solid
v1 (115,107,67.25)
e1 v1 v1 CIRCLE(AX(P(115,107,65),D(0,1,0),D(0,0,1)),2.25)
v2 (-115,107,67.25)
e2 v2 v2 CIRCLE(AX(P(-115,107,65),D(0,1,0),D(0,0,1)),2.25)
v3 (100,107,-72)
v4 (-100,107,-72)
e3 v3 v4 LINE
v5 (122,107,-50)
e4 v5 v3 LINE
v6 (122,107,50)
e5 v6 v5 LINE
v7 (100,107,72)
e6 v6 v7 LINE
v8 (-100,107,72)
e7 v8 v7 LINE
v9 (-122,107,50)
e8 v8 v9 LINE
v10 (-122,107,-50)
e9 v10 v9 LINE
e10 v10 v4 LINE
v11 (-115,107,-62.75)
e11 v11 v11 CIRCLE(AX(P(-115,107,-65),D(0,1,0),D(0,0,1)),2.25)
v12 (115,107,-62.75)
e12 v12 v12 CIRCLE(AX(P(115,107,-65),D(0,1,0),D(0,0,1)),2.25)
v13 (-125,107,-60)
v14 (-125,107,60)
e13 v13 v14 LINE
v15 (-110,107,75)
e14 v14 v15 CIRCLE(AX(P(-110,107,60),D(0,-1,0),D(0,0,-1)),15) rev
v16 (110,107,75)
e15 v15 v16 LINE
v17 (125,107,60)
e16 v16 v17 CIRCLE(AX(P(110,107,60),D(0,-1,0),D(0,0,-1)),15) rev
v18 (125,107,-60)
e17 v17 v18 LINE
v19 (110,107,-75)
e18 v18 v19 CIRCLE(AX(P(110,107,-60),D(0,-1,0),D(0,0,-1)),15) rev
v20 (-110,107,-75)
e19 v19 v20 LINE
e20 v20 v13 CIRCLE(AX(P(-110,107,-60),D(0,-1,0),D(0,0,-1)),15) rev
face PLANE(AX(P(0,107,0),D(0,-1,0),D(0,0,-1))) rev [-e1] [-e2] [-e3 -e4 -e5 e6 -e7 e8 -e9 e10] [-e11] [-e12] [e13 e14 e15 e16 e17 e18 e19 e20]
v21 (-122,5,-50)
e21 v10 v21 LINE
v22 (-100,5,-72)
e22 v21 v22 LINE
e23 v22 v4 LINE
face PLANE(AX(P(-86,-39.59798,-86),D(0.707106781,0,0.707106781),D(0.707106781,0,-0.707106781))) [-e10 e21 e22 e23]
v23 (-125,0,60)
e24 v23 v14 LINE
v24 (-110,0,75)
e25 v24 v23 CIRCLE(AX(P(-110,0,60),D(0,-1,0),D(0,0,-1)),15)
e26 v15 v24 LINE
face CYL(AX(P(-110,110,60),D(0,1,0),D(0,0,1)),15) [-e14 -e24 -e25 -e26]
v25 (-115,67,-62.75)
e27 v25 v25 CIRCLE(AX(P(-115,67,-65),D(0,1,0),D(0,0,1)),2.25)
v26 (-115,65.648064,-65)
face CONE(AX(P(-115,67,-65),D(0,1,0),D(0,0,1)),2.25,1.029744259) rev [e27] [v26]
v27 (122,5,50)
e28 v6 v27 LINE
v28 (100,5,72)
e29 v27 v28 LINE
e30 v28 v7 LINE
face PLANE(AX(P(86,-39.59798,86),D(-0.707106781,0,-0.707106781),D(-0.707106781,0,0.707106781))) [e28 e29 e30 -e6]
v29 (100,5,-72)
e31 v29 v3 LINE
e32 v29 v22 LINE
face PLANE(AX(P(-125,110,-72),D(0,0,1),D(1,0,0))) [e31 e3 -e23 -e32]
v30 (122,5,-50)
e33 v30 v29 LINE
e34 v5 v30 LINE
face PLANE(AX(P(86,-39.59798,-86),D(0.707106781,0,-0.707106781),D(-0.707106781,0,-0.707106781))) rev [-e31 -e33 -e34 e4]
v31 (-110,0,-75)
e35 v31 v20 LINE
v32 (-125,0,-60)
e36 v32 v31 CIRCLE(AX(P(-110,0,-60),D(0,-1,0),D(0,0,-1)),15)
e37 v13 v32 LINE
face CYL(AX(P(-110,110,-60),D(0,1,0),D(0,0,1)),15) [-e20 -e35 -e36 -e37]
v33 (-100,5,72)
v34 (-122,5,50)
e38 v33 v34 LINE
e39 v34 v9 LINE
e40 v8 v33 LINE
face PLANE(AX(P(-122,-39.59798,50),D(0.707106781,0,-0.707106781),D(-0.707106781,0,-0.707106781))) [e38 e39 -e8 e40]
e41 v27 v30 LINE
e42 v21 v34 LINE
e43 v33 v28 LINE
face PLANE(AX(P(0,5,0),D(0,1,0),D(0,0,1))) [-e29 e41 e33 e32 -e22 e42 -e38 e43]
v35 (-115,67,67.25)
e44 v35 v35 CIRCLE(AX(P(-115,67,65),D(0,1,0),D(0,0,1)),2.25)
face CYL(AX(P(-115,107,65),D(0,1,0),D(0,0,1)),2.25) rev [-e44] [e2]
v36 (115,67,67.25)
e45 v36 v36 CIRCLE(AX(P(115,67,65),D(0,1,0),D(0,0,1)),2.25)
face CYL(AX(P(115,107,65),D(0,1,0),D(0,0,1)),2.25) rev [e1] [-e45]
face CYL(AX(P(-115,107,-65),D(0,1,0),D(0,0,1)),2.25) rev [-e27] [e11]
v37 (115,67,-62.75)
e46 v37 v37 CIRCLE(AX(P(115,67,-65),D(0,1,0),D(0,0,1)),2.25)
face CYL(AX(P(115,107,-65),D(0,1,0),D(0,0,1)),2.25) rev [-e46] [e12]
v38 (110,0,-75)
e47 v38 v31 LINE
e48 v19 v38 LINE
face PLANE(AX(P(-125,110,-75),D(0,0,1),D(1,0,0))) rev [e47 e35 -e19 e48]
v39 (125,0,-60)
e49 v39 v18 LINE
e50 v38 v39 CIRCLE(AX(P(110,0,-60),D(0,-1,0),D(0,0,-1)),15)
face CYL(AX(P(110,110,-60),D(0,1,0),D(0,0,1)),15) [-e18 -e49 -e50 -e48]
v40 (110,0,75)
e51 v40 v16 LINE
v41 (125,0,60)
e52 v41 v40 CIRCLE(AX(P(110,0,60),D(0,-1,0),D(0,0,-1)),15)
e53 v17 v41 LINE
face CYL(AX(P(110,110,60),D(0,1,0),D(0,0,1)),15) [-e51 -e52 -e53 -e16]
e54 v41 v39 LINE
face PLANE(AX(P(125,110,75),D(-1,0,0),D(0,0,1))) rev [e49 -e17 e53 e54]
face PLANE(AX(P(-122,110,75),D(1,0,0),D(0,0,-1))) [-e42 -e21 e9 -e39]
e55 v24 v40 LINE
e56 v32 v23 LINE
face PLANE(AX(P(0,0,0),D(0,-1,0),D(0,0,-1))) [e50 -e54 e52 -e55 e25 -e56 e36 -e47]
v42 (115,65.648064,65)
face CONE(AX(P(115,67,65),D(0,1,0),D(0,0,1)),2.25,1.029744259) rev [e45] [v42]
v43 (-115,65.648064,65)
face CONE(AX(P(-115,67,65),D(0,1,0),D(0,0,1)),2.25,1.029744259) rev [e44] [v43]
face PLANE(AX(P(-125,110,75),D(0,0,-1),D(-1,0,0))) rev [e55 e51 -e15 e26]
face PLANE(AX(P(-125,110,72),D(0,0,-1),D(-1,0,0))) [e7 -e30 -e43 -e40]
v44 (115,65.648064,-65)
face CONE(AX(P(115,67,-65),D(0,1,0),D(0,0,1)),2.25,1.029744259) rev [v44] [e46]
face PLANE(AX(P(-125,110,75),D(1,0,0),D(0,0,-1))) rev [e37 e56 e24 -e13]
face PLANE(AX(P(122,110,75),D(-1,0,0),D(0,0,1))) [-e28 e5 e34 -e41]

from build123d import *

# Parameters (mm, degrees)
CROQUIS1_W                       = 250
CROQUIS1_H                       = 150
SALIENTE_EXTRUIR1_DEPTH          = 110
REDONDEO1_R                      = 15
VACIADO2_T                       = -3
CROQUIS3_W                       = 250
CROQUIS3_H                       = 150
SALIENTE_EXTRUIR2_DEPTH          = 5
REDONDEO2_R                      = 15
CROQUIS4_W                       = 250
CROQUIS4_H                       = 150
CORTAR_EXTRUIR1_DEPTH            = 3
SALIENTE_EXTRUIR3_DEPTH          = 107
REDONDEO3_R                      = 15
TALADRO_DE_MARGEN_PARA_M41_D     = 4.5
TALADRO_DE_MARGEN_PARA_M41_DEPTH = 40
TALADRO_DE_MARGEN_PARA_M41_TIP   = 1.351936393


with BuildPart() as part:
    # Croquis1 → Saliente-Extruir1 (new body)
    with BuildSketch(Plane(origin=(0, 0, 0), x_dir=(1, 0, 0), z_dir=(0, 1, 0))):
        Rectangle(CROQUIS1_W, CROQUIS1_H)
    extrude(amount=SALIENTE_EXTRUIR1_DEPTH)

    # Redondeo1
    redondeo1_edges = [part.edges().sort_by_distance(p)[0] for p in [
        (125, 55, 75),
        (-125, 55, 75),
        (-125, 55, -75),
        (125, 55, -75),
    ]]
    fillet(redondeo1_edges, radius=REDONDEO1_R)

    # Vaciado2
    vaciado2_openings = [part.faces().sort_by_distance(p)[0] for p in [
        (0, 0, 0),
    ]]
    offset(amount=VACIADO2_T, openings=vaciado2_openings, kind=Kind.INTERSECTION)

    # Croquis3 → Saliente-Extruir2 (add)
    with BuildSketch(Plane.XZ):
        Rectangle(CROQUIS3_W, CROQUIS3_H)
    extrude(amount=-SALIENTE_EXTRUIR2_DEPTH)

    # Redondeo2
    redondeo2_edges = [part.edges().sort_by_distance(p)[0] for p in [
        (125, 2.5, 75),
        (125, 2.5, -75),
        (-125, 2.5, -75),
        (-125, 2.5, 75),
    ]]
    fillet(redondeo2_edges, radius=REDONDEO2_R - 0.0001)  # a hair under: the kernel refuses the full size

    # Croquis4 → Cortar-Extruir1 (cut)
    with BuildSketch(Plane(origin=(0, 110, 0), x_dir=(1, 0, 0), z_dir=(0, 1, 0))):
        Rectangle(CROQUIS4_W, CROQUIS4_H)
    extrude(amount=-CORTAR_EXTRUIR1_DEPTH, mode=Mode.SUBTRACT)

    # Croquis5 → Saliente-Extruir3 (add)
    with BuildSketch(Plane(origin=(0, 107, 0), x_dir=(1, 0, 0), z_dir=(0, 1, 0))):
        Polygon((-125, -47), (-125, -75), (-97, -75), align=None)
        Polygon((-97, 75), (-125, 75), (-125, 47), (-122, 50), (-100, 72), align=None)
        Polygon((97, -75), (125, -75), (125, -47), align=None)
        Polygon((97, 75), (125, 47), (125, 75), align=None)
    extrude(amount=-SALIENTE_EXTRUIR3_DEPTH)

    # Redondeo3
    redondeo3_edges = [part.edges().sort_by_distance(p)[0] for p in [
        (-125, 53.5, -75),
        (125, 53.5, 75),
        (-125, 53.5, 75),
        (125, 53.5, -75),
    ]]
    fillet(redondeo3_edges, radius=REDONDEO3_R)

    # Taladro de margen para M41
    with Locations(Plane(origin=(0, 107, 0), x_dir=(1, 0, 0), z_dir=(0, 1, 0))):
        with Locations((-115, 65), (115, 65), (115, -65), (-115, -65)):
            Hole(TALADRO_DE_MARGEN_PARA_M41_D / 2, depth=TALADRO_DE_MARGEN_PARA_M41_DEPTH)
            with Locations((0, 0, -(TALADRO_DE_MARGEN_PARA_M41_DEPTH + TALADRO_DE_MARGEN_PARA_M41_TIP / 2))):  # 118° drill point
                Cone(0, TALADRO_DE_MARGEN_PARA_M41_D / 2, TALADRO_DE_MARGEN_PARA_M41_TIP, mode=Mode.SUBTRACT)


solid = part.part
